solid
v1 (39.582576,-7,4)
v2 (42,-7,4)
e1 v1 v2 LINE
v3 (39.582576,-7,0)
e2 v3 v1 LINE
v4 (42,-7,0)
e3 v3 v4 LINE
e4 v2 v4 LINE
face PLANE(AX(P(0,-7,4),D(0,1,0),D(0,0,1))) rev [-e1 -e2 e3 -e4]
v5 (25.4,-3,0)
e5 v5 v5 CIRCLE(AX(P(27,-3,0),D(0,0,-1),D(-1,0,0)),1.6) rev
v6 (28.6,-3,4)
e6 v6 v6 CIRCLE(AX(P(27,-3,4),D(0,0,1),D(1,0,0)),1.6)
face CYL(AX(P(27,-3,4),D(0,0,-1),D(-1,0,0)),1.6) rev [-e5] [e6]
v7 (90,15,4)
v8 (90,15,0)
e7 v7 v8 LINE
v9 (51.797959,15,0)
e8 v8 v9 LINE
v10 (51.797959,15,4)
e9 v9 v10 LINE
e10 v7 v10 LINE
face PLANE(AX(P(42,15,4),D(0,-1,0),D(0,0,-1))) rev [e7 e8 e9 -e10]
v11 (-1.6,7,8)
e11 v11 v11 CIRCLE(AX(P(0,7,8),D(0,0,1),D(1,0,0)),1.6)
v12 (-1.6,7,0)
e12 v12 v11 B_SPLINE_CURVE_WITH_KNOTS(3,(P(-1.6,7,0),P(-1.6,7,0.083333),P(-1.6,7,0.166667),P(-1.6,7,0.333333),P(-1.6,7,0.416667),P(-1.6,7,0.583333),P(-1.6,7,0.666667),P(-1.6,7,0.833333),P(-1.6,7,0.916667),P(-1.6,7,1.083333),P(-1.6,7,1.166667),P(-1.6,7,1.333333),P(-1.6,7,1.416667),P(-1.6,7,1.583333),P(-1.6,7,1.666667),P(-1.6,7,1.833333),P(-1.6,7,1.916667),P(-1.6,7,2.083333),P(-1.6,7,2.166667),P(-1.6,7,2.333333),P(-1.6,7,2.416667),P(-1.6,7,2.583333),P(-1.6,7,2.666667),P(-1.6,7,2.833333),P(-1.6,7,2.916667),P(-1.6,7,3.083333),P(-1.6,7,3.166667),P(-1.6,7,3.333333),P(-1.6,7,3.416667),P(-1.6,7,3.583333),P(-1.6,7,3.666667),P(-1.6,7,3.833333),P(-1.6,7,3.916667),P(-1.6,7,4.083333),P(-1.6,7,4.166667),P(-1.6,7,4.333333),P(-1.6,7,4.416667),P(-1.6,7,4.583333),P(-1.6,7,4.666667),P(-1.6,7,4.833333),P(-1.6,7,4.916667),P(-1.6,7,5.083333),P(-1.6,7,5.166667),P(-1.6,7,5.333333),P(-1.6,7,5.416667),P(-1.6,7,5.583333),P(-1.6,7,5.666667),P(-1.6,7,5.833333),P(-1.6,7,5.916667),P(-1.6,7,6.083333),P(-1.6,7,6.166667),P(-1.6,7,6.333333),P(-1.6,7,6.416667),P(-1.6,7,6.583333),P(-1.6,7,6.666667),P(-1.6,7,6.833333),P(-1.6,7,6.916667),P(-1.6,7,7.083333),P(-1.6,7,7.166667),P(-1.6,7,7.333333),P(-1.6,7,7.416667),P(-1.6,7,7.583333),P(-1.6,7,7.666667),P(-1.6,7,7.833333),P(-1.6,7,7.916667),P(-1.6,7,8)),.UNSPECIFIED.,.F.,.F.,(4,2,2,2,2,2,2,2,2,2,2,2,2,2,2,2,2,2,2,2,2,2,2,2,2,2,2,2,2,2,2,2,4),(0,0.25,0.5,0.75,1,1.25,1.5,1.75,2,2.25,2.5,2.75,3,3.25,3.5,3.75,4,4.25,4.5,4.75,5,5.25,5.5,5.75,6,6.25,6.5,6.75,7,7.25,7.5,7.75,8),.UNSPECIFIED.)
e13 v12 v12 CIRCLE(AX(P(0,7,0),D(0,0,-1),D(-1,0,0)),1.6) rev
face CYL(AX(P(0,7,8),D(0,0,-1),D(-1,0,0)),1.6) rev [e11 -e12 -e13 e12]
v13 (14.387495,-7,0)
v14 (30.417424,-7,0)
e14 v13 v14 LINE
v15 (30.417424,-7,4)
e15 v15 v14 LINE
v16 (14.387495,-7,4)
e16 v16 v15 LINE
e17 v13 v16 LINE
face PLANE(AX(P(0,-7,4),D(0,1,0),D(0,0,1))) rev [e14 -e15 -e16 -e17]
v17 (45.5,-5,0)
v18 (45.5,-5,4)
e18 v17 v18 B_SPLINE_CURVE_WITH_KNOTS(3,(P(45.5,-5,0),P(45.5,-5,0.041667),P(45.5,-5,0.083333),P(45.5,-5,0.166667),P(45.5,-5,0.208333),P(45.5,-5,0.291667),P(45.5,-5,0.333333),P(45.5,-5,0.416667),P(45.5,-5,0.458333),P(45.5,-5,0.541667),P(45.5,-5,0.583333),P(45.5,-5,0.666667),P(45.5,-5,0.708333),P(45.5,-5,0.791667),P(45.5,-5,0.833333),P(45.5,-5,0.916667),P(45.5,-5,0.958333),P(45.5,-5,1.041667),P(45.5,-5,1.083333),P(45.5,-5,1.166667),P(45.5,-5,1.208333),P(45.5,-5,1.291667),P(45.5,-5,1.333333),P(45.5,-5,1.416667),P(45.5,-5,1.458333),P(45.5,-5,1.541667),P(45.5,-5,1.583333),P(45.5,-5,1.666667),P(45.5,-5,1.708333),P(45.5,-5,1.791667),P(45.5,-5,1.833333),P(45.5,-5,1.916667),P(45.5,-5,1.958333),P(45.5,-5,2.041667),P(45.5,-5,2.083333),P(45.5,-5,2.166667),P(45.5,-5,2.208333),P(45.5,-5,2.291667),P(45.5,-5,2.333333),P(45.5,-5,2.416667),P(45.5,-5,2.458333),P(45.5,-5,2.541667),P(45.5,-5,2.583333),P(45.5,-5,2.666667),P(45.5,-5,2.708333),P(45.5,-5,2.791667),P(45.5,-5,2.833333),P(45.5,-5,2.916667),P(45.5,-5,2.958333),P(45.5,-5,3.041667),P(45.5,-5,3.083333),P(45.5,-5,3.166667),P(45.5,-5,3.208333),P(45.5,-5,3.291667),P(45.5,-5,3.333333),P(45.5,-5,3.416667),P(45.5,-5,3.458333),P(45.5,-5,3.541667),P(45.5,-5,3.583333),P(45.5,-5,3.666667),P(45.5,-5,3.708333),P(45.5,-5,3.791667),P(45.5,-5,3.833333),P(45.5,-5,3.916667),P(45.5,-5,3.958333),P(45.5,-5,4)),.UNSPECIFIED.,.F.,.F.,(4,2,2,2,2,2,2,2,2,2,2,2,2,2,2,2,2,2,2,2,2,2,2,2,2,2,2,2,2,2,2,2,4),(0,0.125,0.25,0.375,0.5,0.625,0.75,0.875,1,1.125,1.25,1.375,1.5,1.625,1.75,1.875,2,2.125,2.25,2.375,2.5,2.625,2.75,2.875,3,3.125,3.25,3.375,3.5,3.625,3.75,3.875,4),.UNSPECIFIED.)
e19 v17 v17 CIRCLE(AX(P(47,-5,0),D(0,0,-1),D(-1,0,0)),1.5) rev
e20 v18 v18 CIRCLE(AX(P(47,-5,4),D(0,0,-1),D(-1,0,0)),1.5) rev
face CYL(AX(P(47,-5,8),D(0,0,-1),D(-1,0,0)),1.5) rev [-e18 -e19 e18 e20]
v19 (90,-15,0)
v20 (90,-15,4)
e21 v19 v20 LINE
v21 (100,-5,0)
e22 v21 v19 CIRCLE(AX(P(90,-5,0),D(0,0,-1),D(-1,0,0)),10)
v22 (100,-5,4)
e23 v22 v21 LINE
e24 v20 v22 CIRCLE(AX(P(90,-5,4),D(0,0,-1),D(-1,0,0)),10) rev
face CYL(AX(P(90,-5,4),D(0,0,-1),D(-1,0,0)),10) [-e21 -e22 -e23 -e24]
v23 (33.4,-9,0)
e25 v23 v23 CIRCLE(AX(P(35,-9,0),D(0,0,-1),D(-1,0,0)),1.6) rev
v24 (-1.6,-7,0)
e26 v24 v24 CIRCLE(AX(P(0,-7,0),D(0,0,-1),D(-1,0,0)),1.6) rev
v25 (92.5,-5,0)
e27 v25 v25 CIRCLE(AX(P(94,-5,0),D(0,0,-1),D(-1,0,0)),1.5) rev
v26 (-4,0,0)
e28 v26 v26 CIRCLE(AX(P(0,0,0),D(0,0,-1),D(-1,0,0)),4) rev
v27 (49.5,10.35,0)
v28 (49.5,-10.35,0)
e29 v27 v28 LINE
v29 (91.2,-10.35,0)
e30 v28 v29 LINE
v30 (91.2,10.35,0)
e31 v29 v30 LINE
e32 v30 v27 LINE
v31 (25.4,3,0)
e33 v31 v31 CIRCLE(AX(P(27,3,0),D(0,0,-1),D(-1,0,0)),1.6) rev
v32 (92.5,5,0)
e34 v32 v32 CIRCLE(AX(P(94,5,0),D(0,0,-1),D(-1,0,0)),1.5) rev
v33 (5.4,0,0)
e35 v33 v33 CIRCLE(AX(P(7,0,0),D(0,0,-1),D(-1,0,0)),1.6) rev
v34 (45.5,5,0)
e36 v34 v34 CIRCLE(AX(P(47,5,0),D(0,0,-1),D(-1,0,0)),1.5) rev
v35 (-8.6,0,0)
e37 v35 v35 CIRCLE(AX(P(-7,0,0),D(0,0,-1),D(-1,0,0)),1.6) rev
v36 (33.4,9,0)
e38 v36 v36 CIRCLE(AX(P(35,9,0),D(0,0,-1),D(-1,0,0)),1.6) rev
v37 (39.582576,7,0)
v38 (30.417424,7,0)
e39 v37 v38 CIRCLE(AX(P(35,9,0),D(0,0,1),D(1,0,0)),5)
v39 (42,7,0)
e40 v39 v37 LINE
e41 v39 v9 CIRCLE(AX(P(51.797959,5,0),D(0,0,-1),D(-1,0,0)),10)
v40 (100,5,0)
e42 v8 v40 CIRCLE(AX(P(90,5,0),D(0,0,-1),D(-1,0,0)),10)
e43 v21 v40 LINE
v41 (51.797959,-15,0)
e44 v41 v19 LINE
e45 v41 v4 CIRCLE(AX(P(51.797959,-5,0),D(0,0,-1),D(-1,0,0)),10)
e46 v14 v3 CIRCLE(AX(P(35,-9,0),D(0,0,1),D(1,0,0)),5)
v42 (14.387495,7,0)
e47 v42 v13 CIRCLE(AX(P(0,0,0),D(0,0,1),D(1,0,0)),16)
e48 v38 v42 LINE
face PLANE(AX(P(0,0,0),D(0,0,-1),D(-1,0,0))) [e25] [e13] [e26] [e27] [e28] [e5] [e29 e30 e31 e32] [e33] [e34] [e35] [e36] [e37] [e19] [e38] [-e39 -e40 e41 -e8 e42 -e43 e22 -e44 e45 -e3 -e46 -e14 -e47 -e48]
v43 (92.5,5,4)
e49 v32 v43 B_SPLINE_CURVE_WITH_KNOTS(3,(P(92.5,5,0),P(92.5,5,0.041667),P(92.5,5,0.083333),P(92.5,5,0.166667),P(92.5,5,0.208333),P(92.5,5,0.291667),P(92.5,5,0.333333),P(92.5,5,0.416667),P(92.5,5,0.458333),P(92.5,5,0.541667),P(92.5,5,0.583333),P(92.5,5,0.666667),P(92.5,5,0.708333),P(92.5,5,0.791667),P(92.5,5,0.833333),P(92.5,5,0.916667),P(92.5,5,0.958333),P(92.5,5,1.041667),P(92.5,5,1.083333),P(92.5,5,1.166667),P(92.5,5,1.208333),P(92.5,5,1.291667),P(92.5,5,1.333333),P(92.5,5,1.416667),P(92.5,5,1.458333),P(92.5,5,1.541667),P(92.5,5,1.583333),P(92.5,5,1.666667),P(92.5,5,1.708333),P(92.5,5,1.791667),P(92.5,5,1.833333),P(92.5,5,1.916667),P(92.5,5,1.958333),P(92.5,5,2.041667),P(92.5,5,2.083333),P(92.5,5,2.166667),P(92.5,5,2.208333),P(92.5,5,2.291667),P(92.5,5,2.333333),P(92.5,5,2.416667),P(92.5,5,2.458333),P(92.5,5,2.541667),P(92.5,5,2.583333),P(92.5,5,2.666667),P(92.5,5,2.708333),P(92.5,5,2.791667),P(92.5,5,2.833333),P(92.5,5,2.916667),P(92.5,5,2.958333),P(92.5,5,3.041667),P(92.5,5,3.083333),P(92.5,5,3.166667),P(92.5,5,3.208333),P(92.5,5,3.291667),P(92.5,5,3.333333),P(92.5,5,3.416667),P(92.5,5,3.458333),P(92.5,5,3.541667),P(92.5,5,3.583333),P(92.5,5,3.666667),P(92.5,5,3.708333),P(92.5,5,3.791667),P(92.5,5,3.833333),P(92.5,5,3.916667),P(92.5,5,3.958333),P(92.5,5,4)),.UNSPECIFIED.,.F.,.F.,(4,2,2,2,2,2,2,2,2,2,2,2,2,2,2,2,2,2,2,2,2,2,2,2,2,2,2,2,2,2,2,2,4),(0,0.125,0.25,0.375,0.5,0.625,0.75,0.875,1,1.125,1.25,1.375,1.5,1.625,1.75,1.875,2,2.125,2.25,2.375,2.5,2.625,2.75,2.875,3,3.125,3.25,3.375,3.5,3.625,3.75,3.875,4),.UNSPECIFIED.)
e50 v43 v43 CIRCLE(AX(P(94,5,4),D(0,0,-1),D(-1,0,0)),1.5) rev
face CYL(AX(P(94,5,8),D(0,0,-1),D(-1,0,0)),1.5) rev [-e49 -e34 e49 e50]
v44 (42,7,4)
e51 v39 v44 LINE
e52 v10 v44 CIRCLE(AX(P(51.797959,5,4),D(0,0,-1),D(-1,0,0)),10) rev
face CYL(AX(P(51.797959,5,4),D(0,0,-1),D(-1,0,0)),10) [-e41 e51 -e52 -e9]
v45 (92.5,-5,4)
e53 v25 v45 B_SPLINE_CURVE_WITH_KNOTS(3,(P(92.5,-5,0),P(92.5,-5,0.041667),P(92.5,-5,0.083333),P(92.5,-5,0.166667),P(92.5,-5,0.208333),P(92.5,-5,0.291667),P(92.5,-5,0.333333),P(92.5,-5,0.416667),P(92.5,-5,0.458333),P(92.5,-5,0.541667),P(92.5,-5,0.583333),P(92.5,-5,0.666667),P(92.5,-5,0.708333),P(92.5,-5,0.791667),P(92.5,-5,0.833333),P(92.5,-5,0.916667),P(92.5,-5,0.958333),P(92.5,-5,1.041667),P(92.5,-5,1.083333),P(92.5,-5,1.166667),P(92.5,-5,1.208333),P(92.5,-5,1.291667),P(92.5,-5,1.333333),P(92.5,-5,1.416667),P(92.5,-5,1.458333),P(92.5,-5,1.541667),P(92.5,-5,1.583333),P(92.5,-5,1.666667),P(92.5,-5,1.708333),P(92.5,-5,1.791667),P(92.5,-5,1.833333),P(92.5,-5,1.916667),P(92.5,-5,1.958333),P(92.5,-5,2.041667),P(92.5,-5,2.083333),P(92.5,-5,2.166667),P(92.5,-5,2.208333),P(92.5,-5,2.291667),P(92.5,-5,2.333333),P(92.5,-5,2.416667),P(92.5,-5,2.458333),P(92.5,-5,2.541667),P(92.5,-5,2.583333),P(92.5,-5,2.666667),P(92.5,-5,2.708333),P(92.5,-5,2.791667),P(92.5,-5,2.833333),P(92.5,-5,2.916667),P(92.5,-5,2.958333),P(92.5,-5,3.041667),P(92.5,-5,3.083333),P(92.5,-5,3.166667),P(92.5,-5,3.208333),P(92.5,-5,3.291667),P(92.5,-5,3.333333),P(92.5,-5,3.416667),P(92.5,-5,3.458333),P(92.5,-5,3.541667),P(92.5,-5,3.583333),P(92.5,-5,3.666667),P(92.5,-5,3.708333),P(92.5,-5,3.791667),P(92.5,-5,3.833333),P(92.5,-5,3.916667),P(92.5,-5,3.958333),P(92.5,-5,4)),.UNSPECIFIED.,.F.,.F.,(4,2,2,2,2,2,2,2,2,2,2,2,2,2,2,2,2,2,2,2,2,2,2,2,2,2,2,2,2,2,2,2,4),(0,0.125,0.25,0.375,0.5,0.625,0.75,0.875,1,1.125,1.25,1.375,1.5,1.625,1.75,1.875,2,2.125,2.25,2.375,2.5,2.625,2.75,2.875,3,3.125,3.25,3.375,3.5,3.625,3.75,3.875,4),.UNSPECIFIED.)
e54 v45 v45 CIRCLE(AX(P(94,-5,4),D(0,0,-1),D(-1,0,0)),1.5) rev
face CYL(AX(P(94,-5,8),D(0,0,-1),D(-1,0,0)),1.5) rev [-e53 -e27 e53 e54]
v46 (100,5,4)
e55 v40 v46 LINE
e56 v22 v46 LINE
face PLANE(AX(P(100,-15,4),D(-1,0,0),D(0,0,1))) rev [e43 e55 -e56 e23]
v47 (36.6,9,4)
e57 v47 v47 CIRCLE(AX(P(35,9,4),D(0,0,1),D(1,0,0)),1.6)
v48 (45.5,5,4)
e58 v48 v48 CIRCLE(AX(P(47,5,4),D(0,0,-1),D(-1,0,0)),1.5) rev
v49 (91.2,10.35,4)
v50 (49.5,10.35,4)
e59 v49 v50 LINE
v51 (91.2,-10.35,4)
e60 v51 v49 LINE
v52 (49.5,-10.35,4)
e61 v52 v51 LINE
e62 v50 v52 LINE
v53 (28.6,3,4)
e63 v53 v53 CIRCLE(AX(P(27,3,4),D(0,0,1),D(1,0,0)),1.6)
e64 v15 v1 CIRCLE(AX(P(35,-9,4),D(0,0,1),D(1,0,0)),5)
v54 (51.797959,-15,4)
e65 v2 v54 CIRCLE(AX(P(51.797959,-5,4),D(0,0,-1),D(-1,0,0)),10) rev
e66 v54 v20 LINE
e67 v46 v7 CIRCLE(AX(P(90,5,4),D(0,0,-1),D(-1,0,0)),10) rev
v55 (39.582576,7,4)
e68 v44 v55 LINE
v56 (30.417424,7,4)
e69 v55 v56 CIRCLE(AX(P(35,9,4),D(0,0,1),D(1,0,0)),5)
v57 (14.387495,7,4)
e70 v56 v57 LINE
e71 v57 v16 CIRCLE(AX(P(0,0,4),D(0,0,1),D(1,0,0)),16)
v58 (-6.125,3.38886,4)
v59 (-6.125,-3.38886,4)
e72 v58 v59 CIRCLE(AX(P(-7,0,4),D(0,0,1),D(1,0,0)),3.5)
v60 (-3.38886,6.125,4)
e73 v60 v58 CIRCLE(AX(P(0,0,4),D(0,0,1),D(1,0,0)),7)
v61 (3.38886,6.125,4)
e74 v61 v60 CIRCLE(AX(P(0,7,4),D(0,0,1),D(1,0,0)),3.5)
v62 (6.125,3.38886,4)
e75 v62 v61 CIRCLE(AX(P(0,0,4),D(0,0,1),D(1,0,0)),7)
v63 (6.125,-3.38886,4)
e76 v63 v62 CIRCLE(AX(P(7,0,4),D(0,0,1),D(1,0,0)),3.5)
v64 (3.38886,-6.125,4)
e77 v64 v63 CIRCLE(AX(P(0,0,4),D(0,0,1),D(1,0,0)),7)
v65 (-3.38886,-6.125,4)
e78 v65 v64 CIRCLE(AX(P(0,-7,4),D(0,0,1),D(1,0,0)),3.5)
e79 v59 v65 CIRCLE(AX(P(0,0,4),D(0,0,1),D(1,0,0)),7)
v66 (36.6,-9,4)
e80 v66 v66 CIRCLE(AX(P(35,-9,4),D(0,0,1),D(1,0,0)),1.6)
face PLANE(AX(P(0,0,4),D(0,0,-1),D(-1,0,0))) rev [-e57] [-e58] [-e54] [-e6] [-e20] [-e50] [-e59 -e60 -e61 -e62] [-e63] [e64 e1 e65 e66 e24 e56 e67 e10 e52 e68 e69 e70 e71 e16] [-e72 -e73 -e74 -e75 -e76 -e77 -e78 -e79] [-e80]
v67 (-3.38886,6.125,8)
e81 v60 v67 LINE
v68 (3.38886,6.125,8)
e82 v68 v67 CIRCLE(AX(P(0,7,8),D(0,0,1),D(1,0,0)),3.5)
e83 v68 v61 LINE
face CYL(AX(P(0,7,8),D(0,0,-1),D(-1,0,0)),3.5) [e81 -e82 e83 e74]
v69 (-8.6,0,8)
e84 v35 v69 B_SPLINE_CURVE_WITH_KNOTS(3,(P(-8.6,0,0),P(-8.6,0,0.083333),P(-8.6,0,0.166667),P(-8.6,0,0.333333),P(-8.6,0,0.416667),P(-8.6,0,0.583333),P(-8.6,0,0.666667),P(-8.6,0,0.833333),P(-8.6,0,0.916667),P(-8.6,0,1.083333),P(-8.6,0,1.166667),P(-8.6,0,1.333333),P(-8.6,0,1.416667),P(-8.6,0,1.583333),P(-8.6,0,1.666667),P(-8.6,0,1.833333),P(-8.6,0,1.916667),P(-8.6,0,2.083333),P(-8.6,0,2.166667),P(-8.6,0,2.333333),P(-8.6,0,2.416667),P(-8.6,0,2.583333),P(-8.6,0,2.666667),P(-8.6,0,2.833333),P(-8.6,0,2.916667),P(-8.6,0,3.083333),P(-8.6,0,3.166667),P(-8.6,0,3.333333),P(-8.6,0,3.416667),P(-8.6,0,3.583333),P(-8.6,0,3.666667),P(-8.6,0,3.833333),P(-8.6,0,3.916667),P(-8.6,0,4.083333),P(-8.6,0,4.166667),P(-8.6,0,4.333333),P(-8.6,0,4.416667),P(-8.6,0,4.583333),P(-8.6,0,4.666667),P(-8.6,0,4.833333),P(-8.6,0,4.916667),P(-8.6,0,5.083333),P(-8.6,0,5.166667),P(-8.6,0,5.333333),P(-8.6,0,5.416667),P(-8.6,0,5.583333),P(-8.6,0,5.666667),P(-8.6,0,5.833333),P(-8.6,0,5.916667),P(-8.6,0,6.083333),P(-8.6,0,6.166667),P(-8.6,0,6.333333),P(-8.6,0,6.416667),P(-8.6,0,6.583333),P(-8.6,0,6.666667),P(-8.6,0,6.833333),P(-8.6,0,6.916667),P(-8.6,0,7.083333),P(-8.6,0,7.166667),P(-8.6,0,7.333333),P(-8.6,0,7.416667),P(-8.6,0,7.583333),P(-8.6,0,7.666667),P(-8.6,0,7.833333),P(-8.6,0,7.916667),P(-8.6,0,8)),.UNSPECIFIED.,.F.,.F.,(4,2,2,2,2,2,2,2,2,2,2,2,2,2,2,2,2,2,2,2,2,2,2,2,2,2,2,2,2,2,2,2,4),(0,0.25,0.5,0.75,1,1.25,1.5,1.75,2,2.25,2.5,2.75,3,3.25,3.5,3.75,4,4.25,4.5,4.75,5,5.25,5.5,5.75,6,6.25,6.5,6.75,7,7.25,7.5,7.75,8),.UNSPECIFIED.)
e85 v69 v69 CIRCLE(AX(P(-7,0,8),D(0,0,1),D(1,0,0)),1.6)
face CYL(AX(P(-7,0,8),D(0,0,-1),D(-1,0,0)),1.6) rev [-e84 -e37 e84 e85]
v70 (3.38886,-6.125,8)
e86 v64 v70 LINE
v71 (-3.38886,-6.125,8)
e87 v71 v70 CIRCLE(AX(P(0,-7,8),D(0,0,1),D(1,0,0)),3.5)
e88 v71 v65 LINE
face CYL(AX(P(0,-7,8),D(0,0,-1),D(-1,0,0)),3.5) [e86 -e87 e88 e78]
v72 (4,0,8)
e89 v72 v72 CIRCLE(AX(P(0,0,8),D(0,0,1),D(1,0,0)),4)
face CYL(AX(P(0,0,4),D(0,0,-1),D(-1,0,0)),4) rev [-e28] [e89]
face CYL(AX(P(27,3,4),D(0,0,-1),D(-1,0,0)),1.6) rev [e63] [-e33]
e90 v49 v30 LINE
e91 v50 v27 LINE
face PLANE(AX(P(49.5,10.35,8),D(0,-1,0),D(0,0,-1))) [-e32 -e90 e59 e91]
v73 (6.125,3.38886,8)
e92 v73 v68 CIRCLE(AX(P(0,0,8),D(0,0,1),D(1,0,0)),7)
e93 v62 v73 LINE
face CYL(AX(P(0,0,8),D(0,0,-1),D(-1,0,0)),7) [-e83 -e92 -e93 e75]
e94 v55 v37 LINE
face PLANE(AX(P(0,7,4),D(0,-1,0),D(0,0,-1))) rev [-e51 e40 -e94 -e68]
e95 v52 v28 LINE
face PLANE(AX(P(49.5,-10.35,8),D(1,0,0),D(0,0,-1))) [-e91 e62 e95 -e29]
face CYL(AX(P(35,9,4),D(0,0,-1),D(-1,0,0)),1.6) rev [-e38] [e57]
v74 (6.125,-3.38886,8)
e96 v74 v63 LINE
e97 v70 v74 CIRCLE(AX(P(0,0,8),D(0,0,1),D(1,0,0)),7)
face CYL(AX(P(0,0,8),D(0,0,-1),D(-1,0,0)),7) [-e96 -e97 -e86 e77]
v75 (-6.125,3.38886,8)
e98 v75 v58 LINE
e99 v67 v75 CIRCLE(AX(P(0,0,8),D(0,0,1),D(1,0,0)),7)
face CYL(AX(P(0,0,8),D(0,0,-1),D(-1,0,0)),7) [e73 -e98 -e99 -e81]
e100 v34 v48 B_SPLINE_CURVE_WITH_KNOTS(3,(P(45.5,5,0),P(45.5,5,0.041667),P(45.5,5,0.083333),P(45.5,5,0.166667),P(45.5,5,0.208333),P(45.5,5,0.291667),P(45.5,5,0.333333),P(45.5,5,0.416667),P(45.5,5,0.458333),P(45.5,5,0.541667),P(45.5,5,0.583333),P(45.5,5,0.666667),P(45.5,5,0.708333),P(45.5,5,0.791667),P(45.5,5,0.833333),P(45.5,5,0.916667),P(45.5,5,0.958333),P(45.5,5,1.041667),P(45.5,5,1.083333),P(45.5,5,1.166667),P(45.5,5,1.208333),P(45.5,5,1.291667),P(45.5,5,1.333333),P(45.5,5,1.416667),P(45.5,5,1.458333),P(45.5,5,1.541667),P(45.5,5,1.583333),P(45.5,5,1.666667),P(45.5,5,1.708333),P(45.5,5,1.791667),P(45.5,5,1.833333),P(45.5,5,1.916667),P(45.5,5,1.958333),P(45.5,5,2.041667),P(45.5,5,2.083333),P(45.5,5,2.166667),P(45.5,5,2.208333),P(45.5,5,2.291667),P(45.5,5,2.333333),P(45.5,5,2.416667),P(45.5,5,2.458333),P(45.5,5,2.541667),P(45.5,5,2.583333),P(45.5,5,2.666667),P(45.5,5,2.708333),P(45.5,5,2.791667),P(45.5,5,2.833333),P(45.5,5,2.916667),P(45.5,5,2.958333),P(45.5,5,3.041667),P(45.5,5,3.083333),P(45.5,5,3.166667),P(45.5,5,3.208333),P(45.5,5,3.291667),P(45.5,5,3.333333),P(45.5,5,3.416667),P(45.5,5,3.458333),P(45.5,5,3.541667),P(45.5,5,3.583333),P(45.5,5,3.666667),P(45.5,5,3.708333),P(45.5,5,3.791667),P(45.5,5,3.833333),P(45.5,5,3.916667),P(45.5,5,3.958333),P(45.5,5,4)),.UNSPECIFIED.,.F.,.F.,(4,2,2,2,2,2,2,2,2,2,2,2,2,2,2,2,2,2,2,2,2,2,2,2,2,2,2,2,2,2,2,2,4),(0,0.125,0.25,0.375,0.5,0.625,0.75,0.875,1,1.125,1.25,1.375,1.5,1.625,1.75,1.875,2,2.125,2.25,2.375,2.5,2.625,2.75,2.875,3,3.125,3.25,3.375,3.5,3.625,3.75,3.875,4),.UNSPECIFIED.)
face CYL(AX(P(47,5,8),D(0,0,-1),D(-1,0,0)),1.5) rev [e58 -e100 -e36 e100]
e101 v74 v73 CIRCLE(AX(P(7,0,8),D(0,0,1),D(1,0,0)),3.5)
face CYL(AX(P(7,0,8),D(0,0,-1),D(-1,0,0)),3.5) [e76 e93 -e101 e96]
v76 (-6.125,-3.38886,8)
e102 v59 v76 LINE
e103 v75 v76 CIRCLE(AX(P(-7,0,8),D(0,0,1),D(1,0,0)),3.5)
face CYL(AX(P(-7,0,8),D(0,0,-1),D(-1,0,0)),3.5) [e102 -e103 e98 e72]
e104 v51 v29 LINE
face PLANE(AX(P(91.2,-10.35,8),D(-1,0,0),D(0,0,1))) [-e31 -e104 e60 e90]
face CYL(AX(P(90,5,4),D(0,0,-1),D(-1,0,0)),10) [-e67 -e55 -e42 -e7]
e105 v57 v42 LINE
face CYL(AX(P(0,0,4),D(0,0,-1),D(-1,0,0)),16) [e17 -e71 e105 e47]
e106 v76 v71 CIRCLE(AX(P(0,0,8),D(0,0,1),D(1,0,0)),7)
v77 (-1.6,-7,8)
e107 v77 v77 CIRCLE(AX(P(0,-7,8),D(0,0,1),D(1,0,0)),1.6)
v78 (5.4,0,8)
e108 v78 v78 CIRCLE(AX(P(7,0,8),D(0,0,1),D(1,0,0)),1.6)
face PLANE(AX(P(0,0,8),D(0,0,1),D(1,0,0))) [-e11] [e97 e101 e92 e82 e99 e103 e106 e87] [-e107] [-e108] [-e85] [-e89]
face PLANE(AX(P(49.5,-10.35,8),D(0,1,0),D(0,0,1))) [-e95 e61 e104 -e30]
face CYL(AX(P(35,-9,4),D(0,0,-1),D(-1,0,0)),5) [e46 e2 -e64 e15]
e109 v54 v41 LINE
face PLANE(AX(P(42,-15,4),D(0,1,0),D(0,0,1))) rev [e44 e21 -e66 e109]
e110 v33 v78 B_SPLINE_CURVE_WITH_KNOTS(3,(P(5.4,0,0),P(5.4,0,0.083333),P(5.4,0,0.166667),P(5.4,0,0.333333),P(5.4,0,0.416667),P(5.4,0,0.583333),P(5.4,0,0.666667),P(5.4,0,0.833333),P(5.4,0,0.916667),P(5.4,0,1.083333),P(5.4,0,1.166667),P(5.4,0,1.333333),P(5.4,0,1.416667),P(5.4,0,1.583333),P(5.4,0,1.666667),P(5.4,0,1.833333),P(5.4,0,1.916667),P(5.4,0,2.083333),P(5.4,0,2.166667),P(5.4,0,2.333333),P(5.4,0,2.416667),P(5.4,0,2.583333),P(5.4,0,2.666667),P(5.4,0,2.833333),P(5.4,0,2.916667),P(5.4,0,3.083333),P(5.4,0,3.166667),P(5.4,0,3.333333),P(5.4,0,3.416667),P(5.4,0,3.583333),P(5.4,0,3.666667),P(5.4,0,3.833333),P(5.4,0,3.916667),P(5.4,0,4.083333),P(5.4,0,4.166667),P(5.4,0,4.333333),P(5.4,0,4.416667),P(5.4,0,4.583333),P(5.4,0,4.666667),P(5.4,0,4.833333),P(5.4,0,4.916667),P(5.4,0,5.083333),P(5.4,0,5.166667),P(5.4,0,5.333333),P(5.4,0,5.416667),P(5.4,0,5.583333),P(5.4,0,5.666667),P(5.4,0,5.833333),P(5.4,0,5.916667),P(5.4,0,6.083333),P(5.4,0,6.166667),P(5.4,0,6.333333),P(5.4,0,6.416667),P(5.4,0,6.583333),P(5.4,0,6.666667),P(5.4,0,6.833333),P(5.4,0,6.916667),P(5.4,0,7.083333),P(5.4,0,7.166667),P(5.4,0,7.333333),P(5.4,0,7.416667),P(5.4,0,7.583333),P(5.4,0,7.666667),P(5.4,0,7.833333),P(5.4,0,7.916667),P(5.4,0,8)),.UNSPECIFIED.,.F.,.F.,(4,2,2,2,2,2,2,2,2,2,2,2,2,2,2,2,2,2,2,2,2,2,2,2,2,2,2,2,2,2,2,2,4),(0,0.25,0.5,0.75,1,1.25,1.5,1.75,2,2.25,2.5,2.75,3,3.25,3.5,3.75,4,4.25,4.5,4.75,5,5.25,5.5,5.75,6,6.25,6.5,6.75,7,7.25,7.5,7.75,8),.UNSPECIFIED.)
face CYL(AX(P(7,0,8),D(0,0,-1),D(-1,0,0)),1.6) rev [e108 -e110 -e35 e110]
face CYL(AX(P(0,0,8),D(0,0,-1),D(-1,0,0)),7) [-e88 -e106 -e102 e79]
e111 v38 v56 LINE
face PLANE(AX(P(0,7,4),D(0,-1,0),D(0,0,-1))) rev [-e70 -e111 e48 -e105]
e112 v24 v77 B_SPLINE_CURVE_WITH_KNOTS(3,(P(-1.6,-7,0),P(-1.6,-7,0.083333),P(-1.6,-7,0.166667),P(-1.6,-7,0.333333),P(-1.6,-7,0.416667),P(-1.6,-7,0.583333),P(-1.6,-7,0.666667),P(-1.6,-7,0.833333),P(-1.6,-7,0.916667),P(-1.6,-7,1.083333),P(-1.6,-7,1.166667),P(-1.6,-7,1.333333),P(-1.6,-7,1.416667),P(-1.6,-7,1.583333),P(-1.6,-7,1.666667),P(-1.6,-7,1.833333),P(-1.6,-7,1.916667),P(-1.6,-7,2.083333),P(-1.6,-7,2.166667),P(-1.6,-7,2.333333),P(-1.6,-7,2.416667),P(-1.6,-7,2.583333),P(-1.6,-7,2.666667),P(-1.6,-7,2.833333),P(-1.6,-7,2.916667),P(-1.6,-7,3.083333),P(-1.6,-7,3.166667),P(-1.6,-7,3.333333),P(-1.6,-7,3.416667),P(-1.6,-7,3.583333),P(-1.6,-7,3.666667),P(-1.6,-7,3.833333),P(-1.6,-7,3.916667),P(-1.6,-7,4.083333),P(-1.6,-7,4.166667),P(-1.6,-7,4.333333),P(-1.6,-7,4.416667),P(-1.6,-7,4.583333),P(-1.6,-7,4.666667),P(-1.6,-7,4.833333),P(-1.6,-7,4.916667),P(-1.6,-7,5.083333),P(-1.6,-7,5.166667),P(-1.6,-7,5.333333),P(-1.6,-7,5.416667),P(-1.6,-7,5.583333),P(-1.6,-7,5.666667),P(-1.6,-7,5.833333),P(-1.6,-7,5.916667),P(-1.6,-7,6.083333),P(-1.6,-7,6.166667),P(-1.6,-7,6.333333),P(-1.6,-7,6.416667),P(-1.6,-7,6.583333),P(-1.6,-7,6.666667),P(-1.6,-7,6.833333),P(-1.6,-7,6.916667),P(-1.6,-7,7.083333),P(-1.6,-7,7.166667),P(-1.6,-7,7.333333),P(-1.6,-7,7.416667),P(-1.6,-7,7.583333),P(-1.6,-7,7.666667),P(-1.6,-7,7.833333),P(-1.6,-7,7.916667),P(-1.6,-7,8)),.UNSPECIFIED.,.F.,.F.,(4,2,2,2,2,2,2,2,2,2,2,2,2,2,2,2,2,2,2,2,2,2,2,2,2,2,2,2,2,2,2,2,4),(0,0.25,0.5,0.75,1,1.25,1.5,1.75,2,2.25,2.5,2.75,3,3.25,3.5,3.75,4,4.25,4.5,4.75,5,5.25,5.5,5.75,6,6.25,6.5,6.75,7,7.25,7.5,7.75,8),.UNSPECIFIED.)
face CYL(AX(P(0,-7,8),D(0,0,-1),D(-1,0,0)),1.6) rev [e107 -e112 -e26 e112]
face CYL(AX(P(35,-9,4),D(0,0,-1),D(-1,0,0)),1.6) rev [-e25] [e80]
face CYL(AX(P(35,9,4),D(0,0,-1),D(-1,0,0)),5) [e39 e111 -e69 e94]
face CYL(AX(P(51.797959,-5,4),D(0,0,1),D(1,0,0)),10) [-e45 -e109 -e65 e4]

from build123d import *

# Parameters (mm, degrees)
MAIN_WEB_PROFILE_W                             = 60
MAIN_WEB_PROFILE_H                             = 14
MAIN_WEB_DEPTH                                 = 4
SHOULDER_HORN_FLANGE_PROFILE_R                 = 16
SHOULDER_HORN_FLANGE_DEPTH                     = 4
ELBOW_SERVO_MOUNT_PROFILE_W                    = 48
ELBOW_SERVO_MOUNT_PROFILE_H                    = 28
ELBOW_SERVO_MOUNT_DEPTH                        = 4
SG90_BODY_CLEARANCE_START                      = -5
SG90_BODY_CLEARANCE_PROFILE_W                  = 23.8
SG90_BODY_CLEARANCE_PROFILE_H                  = 13
SG90_BODY_CLEARANCE_DEPTH                      = 97.49863387
ELBOW_TAB_FASTENERS_START                      = -50
ELBOW_TAB_FASTENERS_PROFILE_R                  = 1.3
ELBOW_TAB_FASTENERS_DEPTH                      = 142.49863387
SHOULDER_CENTER_SCREW_ACCESS_START             = -50
SHOULDER_CENTER_SCREW_ACCESS_PROFILE_R         = 4
SHOULDER_CENTER_SCREW_ACCESS_DEPTH             = 142.49863387
CABLE_TIE_HOLES_START                          = -50
CABLE_TIE_HOLES_PROFILE_R                      = 1.6
CABLE_TIE_HOLES_DEPTH                          = 142.49863387
PASSIVE_LOWER_MOUNT_BOSS_PROFILE_R             = 5
PASSIVE_LOWER_MOUNT_BOSS_DEPTH                 = 4
PASSIVE_UPPER_MOUNT_BOSS_PROFILE_R             = 5
PASSIVE_UPPER_MOUNT_BOSS_DEPTH                 = 4
PASSIVE_CHEEK_STANDOFFS_START                  = -50
PASSIVE_CHEEK_STANDOFFS_PROFILE_R              = 1.6
PASSIVE_CHEEK_STANDOFFS_DEPTH                  = 142.49863387
SHOULDER_DOWEL_SUPPORT_HUB_START               = 4
SHOULDER_DOWEL_SUPPORT_HUB_PROFILE_R           = 7
SHOULDER_DOWEL_SUPPORT_HUB_PROFILE_R_2         = 4
SHOULDER_DOWEL_SUPPORT_HUB_DEPTH               = 4
RAISED_M3_WASHER_SEATS_HEIGHT8_START           = 4
RAISED_M3_WASHER_SEATS_PCD14_PROFILE_R         = 3.5
RAISED_M3_WASHER_SEATS_HEIGHT8_DEPTH           = 4
METAL_HORN_M3_CLEARANCE_PCD14_START            = -50
METAL_HORN_M3_CLEARANCE_PCD14_PROFILE_R        = 1.6
METAL_HORN_M3_CLEARANCE_PCD14_DEPTH            = 142.760557976
RESTORE_SHOULDER_SLEEVE_BORE_START             = -50
RESTORE_SHOULDER_SLEEVE_BORE_PROFILE_R         = 4
RESTORE_SHOULDER_SLEEVE_BORE_DEPTH             = 142.760557976
FILLET1_R                                      = 7.5
LARGER_ELBOW_SERVO_MOUNT_REPLACES_SG_2_W       = 58
LARGER_ELBOW_SERVO_MOUNT_REPLACES_SG_2_H       = 30
LARGER_ELBOW_SERVO_MOUNT_REPLACES_SG90_O_DEPTH = 4
MG996R_ELBOW_BODY_CLEARANCE_START              = -5
MG996R_ELBOW_BODY_CLEARANCE_PROFILE_W          = 41.7
MG996R_ELBOW_BODY_CLEARANCE_PROFILE_H          = 20.7
MG996R_ELBOW_BODY_CLEARANCE_DEPTH              = 107.587400794
MG996R_ELBOW_TAB_FASTENERS_START               = -50
MG996R_ELBOW_TAB_FASTENERS_PROFILE_R           = 1.5
MG996R_ELBOW_TAB_FASTENERS_DEPTH               = 152.587400794
FILLET2_R                                      = 10


with BuildPart() as part:
    # Main_web_profile → Main_web (new body)
    with BuildSketch(Plane.XY):
        with Locations((30, 0)):
            Rectangle(MAIN_WEB_PROFILE_W, MAIN_WEB_PROFILE_H)
    extrude(amount=MAIN_WEB_DEPTH)

    # Shoulder_horn_flange_profile → Shoulder_horn_flange (add)
    with BuildSketch(Plane.XY):
        Circle(SHOULDER_HORN_FLANGE_PROFILE_R)
    extrude(amount=SHOULDER_HORN_FLANGE_DEPTH)

    # Elbow_servo_mount_profile → Elbow_servo_mount (add)
    with BuildSketch(Plane.XY):
        with Locations((66, 0)):
            Rectangle(ELBOW_SERVO_MOUNT_PROFILE_W, ELBOW_SERVO_MOUNT_PROFILE_H)
    extrude(amount=ELBOW_SERVO_MOUNT_DEPTH)

    # SG90_body_clearance_profile → SG90_body_clearance (cut, through all)
    with BuildSketch(Plane.XY.offset(SG90_BODY_CLEARANCE_START)):
        with Locations((65.5, 0)):
            Rectangle(SG90_BODY_CLEARANCE_PROFILE_W, SG90_BODY_CLEARANCE_PROFILE_H)
    extrude(amount=SG90_BODY_CLEARANCE_DEPTH, mode=Mode.SUBTRACT)

    # Elbow_tab_fasteners_profile → Elbow_tab_fasteners (cut, through all)
    with BuildSketch(Plane.XY.offset(ELBOW_TAB_FASTENERS_START)):
        with Locations(Location((51, 0, 0), (0, 0, 180))):
            Circle(ELBOW_TAB_FASTENERS_PROFILE_R)
        with Locations(Location((80, 0, 0), (0, 0, 180))):
            Circle(ELBOW_TAB_FASTENERS_PROFILE_R)
    extrude(amount=ELBOW_TAB_FASTENERS_DEPTH, mode=Mode.SUBTRACT)

    # Shoulder_center_screw_access_profile → Shoulder_center_screw_access (cut, through all)
    with BuildSketch(Plane.XY.offset(SHOULDER_CENTER_SCREW_ACCESS_START)):
        with Locations(Location((0, 0, 0), (0, 0, 180))):
            Circle(SHOULDER_CENTER_SCREW_ACCESS_PROFILE_R)
    extrude(amount=SHOULDER_CENTER_SCREW_ACCESS_DEPTH, mode=Mode.SUBTRACT)

    # Cable_tie_holes_profile → Cable_tie_holes (cut, through all)
    with BuildSketch(Plane.XY.offset(CABLE_TIE_HOLES_START)):
        with Locations(Location((27, -3, 0), (0, 0, 180))):
            Circle(CABLE_TIE_HOLES_PROFILE_R)
        with Locations(Location((27, 3, 0), (0, 0, 180))):
            Circle(CABLE_TIE_HOLES_PROFILE_R)
    extrude(amount=CABLE_TIE_HOLES_DEPTH, mode=Mode.SUBTRACT)

    # Passive_lower_mount_boss_profile → Passive_lower_mount_boss (add)
    with BuildSketch(Plane.XY):
        with Locations((35, -9)):
            Circle(PASSIVE_LOWER_MOUNT_BOSS_PROFILE_R)
    extrude(amount=PASSIVE_LOWER_MOUNT_BOSS_DEPTH)

    # Passive_upper_mount_boss_profile → Passive_upper_mount_boss (add)
    with BuildSketch(Plane.XY):
        with Locations((35, 9)):
            Circle(PASSIVE_UPPER_MOUNT_BOSS_PROFILE_R)
    extrude(amount=PASSIVE_UPPER_MOUNT_BOSS_DEPTH)

    # Passive_cheek_standoffs_profile → Passive_cheek_standoffs (cut, through all)
    with BuildSketch(Plane.XY.offset(PASSIVE_CHEEK_STANDOFFS_START)):
        with Locations(Location((35, -9, 0), (0, 0, 180))):
            Circle(PASSIVE_CHEEK_STANDOFFS_PROFILE_R)
        with Locations(Location((35, 9, 0), (0, 0, 180))):
            Circle(PASSIVE_CHEEK_STANDOFFS_PROFILE_R)
    extrude(amount=PASSIVE_CHEEK_STANDOFFS_DEPTH, mode=Mode.SUBTRACT)

    # Shoulder_dowel_support_hub_profile → Shoulder_dowel_support_hub (add)
    with BuildSketch(Plane.XY.offset(SHOULDER_DOWEL_SUPPORT_HUB_START)):
        Circle(SHOULDER_DOWEL_SUPPORT_HUB_PROFILE_R)
        with Locations(Location((0, 0, 0), (0, 0, 180))):
            Circle(SHOULDER_DOWEL_SUPPORT_HUB_PROFILE_R_2, mode=Mode.SUBTRACT)
    extrude(amount=SHOULDER_DOWEL_SUPPORT_HUB_DEPTH)

    # Raised_M3_washer_seats_PCD14_profile → Raised_M3_washer_seats_height8 (add)
    with BuildSketch(Plane.XY.offset(RAISED_M3_WASHER_SEATS_HEIGHT8_START)):
        with Locations((7, 0)):
            Circle(RAISED_M3_WASHER_SEATS_PCD14_PROFILE_R)
        with Locations((-7, 0)):
            Circle(RAISED_M3_WASHER_SEATS_PCD14_PROFILE_R)
        with Locations((0, 7)):
            Circle(RAISED_M3_WASHER_SEATS_PCD14_PROFILE_R)
        with Locations((0, -7)):
            Circle(RAISED_M3_WASHER_SEATS_PCD14_PROFILE_R)
    extrude(amount=RAISED_M3_WASHER_SEATS_HEIGHT8_DEPTH)

    # Metal_horn_M3_clearance_PCD14_profile → Metal_horn_M3_clearance_PCD14 (cut, through all)
    with BuildSketch(Plane.XY.offset(METAL_HORN_M3_CLEARANCE_PCD14_START)):
        with Locations(Location((7, 0, 0), (0, 0, 180))):
            Circle(METAL_HORN_M3_CLEARANCE_PCD14_PROFILE_R)
        with Locations(Location((-7, 0, 0), (0, 0, 180))):
            Circle(METAL_HORN_M3_CLEARANCE_PCD14_PROFILE_R)
        with Locations(Location((0, 7, 0), (0, 0, 180))):
            Circle(METAL_HORN_M3_CLEARANCE_PCD14_PROFILE_R)
        with Locations(Location((0, -7, 0), (0, 0, 180))):
            Circle(METAL_HORN_M3_CLEARANCE_PCD14_PROFILE_R)
    extrude(amount=METAL_HORN_M3_CLEARANCE_PCD14_DEPTH, mode=Mode.SUBTRACT)

    # Restore_shoulder_sleeve_bore_profile → Restore_shoulder_sleeve_bore (cut, through all)
    with BuildSketch(Plane.XY.offset(RESTORE_SHOULDER_SLEEVE_BORE_START)):
        with Locations(Location((0, 0, 0), (0, 0, 180))):
            Circle(RESTORE_SHOULDER_SLEEVE_BORE_PROFILE_R)
    extrude(amount=RESTORE_SHOULDER_SLEEVE_BORE_DEPTH, mode=Mode.SUBTRACT)

    # Fillet1
    # the kernel refuses this fillet: 7.5 mm, written as the material it takes off along each edge
    with BuildSketch(Plane(origin=(42, -14, -18.708286934), x_dir=(0, 1, 0), z_dir=(0, 0, 1))) as fillet1_piece_1:
        with BuildLine():
            CenterArc((7.5, -7.483314774), FILLET1_R, 93.822553729, 86.177446271)
            Line((0, -7.483314774), (-0.15, -7.483314774))
            Line((-0.15, -7.483314774), (-0.15, 0))
            Line((-0.15, 0), (0, 0.15))
            ThreePointArc((0, 0.15), (3.5, 0.15), (6.99, 0.149666295))
            Line((6.99, 0.149666295), (7, 0))
        make_face()
    extrude(amount=41.416573868, mode=Mode.SUBTRACT)
    with BuildSketch(Plane(origin=(90, -14, -18.75), x_dir=(-1, 0, 0), z_dir=(0, 0, 1)), Plane(origin=(90, 14, -18.75), x_dir=(0, -1, 0), z_dir=(0, 0, 1))) as fillet1_piece_2:
        with BuildLine():
            CenterArc((FILLET1_R, -FILLET1_R), FILLET1_R, 90, 90)
            Line((0, -FILLET1_R), (-FILLET1_R * 0.02, -FILLET1_R))
            Line((-FILLET1_R * 0.02, -FILLET1_R), (-FILLET1_R * 0.02, FILLET1_R * 0.02))
            Line((-FILLET1_R * 0.02, FILLET1_R * 0.02), (FILLET1_R, FILLET1_R * 0.02))
            Line((FILLET1_R, FILLET1_R * 0.02), (FILLET1_R, 0))
        make_face()
    extrude(amount=41.5, mode=Mode.SUBTRACT)
    with BuildSketch(Plane(origin=(42, 14, -18.708286934), x_dir=(0, -1, 0), z_dir=(0, 0, 1))) as fillet1_piece_3:
        with BuildLine():
            CenterArc((7.5, 7.483314774), FILLET1_R, 180, 86.177446271)
            Line((0, 7.483314774), (-0.15, 7.483314774))
            Line((-0.15, 7.483314774), (-0.15, 0))
            Line((-0.15, 0), (0, -0.15))
            ThreePointArc((0, -0.15), (3.5, -0.15), (6.99, -0.149666295))
            Line((6.99, -0.149666295), (7, 0))
        make_face()
    extrude(amount=41.416573868, mode=Mode.SUBTRACT)

    # Larger_elbow_servo_mount_replaces_SG 2 → Larger_elbow_servo_mount_replaces_SG90_o (add)
    with BuildSketch(Plane.XY):
        with Locations((71, 0)):
            Rectangle(LARGER_ELBOW_SERVO_MOUNT_REPLACES_SG_2_W, LARGER_ELBOW_SERVO_MOUNT_REPLACES_SG_2_H)
    extrude(amount=LARGER_ELBOW_SERVO_MOUNT_REPLACES_SG90_O_DEPTH)

    # MG996R_elbow_body_clearance_profile → MG996R_elbow_body_clearance (cut, through all)
    with BuildSketch(Plane.XY.offset(MG996R_ELBOW_BODY_CLEARANCE_START)):
        with Locations((70.35, 0)):
            Rectangle(MG996R_ELBOW_BODY_CLEARANCE_PROFILE_W, MG996R_ELBOW_BODY_CLEARANCE_PROFILE_H)
    extrude(amount=MG996R_ELBOW_BODY_CLEARANCE_DEPTH, mode=Mode.SUBTRACT)

    # MG996R_elbow_tab_fasteners_profile → MG996R_elbow_tab_fasteners (cut, through all)
    with BuildSketch(Plane.XY.offset(MG996R_ELBOW_TAB_FASTENERS_START)):
        with Locations(Location((47, -5, 0), (0, 0, 180))):
            Circle(MG996R_ELBOW_TAB_FASTENERS_PROFILE_R)
        with Locations(Location((47, 5, 0), (0, 0, 180))):
            Circle(MG996R_ELBOW_TAB_FASTENERS_PROFILE_R)
        with Locations(Location((94, -5, 0), (0, 0, 180))):
            Circle(MG996R_ELBOW_TAB_FASTENERS_PROFILE_R)
        with Locations(Location((94, 5, 0), (0, 0, 180))):
            Circle(MG996R_ELBOW_TAB_FASTENERS_PROFILE_R)
    extrude(amount=MG996R_ELBOW_TAB_FASTENERS_DEPTH, mode=Mode.SUBTRACT)

    # Fillet2
    # the kernel refuses this fillet: 10 mm, written as the material it takes off along each edge
    with BuildSketch(Plane(origin=(42, 15, -24.494897428), x_dir=(1, 0, 0), z_dir=(0, 0, 1))) as fillet2_piece_1:
        with BuildLine():
            CenterArc((9.797958971, -10), FILLET2_R, 90, 78.463040967)
            Line((0, -8), (-0.195959179, -7.96))
            ThreePointArc((-0.195959179, -7.96), (-0.2, -4), (-0.2, 0))
            Line((-0.2, 0), (0, 0.2))
            Line((0, 0.2), (9.797958971, 0.2))
            Line((9.797958971, 0.2), (9.797958971, 0))
        make_face()
    extrude(amount=52.989794856, mode=Mode.SUBTRACT)
    with BuildSketch(Plane(origin=(42, -15, -24.494897428), x_dir=(0, 1, 0), z_dir=(0, 0, 1))) as fillet2_piece_2:
        with BuildLine():
            CenterArc((10, -9.797958971), FILLET2_R, 101.536959033, 78.463040967)
            Line((0, -9.797958971), (-0.2, -9.797958971))
            Line((-0.2, -9.797958971), (-0.2, 0))
            Line((-0.2, 0), (0, 0.2))
            ThreePointArc((0, 0.2), (4, 0.2), (7.96, 0.195959179))
            Line((7.96, 0.195959179), (8, 0))
        make_face()
    extrude(amount=52.989794856, mode=Mode.SUBTRACT)
    with BuildSketch(Plane(origin=(100, -15, -25), x_dir=(-1, 0, 0), z_dir=(0, 0, 1)), Plane(origin=(100, 15, -25), x_dir=(0, -1, 0), z_dir=(0, 0, 1))) as fillet2_piece_3:
        with BuildLine():
            CenterArc((FILLET2_R, -FILLET2_R), FILLET2_R, 90, 90)
            Line((0, -FILLET2_R), (-FILLET2_R * 0.02, -FILLET2_R))
            Line((-FILLET2_R * 0.02, -FILLET2_R), (-FILLET2_R * 0.02, FILLET2_R * 0.02))
            Line((-FILLET2_R * 0.02, FILLET2_R * 0.02), (FILLET2_R, FILLET2_R * 0.02))
            Line((FILLET2_R, FILLET2_R * 0.02), (FILLET2_R, 0))
        make_face()
    extrude(amount=54, mode=Mode.SUBTRACT)


solid = part.part
